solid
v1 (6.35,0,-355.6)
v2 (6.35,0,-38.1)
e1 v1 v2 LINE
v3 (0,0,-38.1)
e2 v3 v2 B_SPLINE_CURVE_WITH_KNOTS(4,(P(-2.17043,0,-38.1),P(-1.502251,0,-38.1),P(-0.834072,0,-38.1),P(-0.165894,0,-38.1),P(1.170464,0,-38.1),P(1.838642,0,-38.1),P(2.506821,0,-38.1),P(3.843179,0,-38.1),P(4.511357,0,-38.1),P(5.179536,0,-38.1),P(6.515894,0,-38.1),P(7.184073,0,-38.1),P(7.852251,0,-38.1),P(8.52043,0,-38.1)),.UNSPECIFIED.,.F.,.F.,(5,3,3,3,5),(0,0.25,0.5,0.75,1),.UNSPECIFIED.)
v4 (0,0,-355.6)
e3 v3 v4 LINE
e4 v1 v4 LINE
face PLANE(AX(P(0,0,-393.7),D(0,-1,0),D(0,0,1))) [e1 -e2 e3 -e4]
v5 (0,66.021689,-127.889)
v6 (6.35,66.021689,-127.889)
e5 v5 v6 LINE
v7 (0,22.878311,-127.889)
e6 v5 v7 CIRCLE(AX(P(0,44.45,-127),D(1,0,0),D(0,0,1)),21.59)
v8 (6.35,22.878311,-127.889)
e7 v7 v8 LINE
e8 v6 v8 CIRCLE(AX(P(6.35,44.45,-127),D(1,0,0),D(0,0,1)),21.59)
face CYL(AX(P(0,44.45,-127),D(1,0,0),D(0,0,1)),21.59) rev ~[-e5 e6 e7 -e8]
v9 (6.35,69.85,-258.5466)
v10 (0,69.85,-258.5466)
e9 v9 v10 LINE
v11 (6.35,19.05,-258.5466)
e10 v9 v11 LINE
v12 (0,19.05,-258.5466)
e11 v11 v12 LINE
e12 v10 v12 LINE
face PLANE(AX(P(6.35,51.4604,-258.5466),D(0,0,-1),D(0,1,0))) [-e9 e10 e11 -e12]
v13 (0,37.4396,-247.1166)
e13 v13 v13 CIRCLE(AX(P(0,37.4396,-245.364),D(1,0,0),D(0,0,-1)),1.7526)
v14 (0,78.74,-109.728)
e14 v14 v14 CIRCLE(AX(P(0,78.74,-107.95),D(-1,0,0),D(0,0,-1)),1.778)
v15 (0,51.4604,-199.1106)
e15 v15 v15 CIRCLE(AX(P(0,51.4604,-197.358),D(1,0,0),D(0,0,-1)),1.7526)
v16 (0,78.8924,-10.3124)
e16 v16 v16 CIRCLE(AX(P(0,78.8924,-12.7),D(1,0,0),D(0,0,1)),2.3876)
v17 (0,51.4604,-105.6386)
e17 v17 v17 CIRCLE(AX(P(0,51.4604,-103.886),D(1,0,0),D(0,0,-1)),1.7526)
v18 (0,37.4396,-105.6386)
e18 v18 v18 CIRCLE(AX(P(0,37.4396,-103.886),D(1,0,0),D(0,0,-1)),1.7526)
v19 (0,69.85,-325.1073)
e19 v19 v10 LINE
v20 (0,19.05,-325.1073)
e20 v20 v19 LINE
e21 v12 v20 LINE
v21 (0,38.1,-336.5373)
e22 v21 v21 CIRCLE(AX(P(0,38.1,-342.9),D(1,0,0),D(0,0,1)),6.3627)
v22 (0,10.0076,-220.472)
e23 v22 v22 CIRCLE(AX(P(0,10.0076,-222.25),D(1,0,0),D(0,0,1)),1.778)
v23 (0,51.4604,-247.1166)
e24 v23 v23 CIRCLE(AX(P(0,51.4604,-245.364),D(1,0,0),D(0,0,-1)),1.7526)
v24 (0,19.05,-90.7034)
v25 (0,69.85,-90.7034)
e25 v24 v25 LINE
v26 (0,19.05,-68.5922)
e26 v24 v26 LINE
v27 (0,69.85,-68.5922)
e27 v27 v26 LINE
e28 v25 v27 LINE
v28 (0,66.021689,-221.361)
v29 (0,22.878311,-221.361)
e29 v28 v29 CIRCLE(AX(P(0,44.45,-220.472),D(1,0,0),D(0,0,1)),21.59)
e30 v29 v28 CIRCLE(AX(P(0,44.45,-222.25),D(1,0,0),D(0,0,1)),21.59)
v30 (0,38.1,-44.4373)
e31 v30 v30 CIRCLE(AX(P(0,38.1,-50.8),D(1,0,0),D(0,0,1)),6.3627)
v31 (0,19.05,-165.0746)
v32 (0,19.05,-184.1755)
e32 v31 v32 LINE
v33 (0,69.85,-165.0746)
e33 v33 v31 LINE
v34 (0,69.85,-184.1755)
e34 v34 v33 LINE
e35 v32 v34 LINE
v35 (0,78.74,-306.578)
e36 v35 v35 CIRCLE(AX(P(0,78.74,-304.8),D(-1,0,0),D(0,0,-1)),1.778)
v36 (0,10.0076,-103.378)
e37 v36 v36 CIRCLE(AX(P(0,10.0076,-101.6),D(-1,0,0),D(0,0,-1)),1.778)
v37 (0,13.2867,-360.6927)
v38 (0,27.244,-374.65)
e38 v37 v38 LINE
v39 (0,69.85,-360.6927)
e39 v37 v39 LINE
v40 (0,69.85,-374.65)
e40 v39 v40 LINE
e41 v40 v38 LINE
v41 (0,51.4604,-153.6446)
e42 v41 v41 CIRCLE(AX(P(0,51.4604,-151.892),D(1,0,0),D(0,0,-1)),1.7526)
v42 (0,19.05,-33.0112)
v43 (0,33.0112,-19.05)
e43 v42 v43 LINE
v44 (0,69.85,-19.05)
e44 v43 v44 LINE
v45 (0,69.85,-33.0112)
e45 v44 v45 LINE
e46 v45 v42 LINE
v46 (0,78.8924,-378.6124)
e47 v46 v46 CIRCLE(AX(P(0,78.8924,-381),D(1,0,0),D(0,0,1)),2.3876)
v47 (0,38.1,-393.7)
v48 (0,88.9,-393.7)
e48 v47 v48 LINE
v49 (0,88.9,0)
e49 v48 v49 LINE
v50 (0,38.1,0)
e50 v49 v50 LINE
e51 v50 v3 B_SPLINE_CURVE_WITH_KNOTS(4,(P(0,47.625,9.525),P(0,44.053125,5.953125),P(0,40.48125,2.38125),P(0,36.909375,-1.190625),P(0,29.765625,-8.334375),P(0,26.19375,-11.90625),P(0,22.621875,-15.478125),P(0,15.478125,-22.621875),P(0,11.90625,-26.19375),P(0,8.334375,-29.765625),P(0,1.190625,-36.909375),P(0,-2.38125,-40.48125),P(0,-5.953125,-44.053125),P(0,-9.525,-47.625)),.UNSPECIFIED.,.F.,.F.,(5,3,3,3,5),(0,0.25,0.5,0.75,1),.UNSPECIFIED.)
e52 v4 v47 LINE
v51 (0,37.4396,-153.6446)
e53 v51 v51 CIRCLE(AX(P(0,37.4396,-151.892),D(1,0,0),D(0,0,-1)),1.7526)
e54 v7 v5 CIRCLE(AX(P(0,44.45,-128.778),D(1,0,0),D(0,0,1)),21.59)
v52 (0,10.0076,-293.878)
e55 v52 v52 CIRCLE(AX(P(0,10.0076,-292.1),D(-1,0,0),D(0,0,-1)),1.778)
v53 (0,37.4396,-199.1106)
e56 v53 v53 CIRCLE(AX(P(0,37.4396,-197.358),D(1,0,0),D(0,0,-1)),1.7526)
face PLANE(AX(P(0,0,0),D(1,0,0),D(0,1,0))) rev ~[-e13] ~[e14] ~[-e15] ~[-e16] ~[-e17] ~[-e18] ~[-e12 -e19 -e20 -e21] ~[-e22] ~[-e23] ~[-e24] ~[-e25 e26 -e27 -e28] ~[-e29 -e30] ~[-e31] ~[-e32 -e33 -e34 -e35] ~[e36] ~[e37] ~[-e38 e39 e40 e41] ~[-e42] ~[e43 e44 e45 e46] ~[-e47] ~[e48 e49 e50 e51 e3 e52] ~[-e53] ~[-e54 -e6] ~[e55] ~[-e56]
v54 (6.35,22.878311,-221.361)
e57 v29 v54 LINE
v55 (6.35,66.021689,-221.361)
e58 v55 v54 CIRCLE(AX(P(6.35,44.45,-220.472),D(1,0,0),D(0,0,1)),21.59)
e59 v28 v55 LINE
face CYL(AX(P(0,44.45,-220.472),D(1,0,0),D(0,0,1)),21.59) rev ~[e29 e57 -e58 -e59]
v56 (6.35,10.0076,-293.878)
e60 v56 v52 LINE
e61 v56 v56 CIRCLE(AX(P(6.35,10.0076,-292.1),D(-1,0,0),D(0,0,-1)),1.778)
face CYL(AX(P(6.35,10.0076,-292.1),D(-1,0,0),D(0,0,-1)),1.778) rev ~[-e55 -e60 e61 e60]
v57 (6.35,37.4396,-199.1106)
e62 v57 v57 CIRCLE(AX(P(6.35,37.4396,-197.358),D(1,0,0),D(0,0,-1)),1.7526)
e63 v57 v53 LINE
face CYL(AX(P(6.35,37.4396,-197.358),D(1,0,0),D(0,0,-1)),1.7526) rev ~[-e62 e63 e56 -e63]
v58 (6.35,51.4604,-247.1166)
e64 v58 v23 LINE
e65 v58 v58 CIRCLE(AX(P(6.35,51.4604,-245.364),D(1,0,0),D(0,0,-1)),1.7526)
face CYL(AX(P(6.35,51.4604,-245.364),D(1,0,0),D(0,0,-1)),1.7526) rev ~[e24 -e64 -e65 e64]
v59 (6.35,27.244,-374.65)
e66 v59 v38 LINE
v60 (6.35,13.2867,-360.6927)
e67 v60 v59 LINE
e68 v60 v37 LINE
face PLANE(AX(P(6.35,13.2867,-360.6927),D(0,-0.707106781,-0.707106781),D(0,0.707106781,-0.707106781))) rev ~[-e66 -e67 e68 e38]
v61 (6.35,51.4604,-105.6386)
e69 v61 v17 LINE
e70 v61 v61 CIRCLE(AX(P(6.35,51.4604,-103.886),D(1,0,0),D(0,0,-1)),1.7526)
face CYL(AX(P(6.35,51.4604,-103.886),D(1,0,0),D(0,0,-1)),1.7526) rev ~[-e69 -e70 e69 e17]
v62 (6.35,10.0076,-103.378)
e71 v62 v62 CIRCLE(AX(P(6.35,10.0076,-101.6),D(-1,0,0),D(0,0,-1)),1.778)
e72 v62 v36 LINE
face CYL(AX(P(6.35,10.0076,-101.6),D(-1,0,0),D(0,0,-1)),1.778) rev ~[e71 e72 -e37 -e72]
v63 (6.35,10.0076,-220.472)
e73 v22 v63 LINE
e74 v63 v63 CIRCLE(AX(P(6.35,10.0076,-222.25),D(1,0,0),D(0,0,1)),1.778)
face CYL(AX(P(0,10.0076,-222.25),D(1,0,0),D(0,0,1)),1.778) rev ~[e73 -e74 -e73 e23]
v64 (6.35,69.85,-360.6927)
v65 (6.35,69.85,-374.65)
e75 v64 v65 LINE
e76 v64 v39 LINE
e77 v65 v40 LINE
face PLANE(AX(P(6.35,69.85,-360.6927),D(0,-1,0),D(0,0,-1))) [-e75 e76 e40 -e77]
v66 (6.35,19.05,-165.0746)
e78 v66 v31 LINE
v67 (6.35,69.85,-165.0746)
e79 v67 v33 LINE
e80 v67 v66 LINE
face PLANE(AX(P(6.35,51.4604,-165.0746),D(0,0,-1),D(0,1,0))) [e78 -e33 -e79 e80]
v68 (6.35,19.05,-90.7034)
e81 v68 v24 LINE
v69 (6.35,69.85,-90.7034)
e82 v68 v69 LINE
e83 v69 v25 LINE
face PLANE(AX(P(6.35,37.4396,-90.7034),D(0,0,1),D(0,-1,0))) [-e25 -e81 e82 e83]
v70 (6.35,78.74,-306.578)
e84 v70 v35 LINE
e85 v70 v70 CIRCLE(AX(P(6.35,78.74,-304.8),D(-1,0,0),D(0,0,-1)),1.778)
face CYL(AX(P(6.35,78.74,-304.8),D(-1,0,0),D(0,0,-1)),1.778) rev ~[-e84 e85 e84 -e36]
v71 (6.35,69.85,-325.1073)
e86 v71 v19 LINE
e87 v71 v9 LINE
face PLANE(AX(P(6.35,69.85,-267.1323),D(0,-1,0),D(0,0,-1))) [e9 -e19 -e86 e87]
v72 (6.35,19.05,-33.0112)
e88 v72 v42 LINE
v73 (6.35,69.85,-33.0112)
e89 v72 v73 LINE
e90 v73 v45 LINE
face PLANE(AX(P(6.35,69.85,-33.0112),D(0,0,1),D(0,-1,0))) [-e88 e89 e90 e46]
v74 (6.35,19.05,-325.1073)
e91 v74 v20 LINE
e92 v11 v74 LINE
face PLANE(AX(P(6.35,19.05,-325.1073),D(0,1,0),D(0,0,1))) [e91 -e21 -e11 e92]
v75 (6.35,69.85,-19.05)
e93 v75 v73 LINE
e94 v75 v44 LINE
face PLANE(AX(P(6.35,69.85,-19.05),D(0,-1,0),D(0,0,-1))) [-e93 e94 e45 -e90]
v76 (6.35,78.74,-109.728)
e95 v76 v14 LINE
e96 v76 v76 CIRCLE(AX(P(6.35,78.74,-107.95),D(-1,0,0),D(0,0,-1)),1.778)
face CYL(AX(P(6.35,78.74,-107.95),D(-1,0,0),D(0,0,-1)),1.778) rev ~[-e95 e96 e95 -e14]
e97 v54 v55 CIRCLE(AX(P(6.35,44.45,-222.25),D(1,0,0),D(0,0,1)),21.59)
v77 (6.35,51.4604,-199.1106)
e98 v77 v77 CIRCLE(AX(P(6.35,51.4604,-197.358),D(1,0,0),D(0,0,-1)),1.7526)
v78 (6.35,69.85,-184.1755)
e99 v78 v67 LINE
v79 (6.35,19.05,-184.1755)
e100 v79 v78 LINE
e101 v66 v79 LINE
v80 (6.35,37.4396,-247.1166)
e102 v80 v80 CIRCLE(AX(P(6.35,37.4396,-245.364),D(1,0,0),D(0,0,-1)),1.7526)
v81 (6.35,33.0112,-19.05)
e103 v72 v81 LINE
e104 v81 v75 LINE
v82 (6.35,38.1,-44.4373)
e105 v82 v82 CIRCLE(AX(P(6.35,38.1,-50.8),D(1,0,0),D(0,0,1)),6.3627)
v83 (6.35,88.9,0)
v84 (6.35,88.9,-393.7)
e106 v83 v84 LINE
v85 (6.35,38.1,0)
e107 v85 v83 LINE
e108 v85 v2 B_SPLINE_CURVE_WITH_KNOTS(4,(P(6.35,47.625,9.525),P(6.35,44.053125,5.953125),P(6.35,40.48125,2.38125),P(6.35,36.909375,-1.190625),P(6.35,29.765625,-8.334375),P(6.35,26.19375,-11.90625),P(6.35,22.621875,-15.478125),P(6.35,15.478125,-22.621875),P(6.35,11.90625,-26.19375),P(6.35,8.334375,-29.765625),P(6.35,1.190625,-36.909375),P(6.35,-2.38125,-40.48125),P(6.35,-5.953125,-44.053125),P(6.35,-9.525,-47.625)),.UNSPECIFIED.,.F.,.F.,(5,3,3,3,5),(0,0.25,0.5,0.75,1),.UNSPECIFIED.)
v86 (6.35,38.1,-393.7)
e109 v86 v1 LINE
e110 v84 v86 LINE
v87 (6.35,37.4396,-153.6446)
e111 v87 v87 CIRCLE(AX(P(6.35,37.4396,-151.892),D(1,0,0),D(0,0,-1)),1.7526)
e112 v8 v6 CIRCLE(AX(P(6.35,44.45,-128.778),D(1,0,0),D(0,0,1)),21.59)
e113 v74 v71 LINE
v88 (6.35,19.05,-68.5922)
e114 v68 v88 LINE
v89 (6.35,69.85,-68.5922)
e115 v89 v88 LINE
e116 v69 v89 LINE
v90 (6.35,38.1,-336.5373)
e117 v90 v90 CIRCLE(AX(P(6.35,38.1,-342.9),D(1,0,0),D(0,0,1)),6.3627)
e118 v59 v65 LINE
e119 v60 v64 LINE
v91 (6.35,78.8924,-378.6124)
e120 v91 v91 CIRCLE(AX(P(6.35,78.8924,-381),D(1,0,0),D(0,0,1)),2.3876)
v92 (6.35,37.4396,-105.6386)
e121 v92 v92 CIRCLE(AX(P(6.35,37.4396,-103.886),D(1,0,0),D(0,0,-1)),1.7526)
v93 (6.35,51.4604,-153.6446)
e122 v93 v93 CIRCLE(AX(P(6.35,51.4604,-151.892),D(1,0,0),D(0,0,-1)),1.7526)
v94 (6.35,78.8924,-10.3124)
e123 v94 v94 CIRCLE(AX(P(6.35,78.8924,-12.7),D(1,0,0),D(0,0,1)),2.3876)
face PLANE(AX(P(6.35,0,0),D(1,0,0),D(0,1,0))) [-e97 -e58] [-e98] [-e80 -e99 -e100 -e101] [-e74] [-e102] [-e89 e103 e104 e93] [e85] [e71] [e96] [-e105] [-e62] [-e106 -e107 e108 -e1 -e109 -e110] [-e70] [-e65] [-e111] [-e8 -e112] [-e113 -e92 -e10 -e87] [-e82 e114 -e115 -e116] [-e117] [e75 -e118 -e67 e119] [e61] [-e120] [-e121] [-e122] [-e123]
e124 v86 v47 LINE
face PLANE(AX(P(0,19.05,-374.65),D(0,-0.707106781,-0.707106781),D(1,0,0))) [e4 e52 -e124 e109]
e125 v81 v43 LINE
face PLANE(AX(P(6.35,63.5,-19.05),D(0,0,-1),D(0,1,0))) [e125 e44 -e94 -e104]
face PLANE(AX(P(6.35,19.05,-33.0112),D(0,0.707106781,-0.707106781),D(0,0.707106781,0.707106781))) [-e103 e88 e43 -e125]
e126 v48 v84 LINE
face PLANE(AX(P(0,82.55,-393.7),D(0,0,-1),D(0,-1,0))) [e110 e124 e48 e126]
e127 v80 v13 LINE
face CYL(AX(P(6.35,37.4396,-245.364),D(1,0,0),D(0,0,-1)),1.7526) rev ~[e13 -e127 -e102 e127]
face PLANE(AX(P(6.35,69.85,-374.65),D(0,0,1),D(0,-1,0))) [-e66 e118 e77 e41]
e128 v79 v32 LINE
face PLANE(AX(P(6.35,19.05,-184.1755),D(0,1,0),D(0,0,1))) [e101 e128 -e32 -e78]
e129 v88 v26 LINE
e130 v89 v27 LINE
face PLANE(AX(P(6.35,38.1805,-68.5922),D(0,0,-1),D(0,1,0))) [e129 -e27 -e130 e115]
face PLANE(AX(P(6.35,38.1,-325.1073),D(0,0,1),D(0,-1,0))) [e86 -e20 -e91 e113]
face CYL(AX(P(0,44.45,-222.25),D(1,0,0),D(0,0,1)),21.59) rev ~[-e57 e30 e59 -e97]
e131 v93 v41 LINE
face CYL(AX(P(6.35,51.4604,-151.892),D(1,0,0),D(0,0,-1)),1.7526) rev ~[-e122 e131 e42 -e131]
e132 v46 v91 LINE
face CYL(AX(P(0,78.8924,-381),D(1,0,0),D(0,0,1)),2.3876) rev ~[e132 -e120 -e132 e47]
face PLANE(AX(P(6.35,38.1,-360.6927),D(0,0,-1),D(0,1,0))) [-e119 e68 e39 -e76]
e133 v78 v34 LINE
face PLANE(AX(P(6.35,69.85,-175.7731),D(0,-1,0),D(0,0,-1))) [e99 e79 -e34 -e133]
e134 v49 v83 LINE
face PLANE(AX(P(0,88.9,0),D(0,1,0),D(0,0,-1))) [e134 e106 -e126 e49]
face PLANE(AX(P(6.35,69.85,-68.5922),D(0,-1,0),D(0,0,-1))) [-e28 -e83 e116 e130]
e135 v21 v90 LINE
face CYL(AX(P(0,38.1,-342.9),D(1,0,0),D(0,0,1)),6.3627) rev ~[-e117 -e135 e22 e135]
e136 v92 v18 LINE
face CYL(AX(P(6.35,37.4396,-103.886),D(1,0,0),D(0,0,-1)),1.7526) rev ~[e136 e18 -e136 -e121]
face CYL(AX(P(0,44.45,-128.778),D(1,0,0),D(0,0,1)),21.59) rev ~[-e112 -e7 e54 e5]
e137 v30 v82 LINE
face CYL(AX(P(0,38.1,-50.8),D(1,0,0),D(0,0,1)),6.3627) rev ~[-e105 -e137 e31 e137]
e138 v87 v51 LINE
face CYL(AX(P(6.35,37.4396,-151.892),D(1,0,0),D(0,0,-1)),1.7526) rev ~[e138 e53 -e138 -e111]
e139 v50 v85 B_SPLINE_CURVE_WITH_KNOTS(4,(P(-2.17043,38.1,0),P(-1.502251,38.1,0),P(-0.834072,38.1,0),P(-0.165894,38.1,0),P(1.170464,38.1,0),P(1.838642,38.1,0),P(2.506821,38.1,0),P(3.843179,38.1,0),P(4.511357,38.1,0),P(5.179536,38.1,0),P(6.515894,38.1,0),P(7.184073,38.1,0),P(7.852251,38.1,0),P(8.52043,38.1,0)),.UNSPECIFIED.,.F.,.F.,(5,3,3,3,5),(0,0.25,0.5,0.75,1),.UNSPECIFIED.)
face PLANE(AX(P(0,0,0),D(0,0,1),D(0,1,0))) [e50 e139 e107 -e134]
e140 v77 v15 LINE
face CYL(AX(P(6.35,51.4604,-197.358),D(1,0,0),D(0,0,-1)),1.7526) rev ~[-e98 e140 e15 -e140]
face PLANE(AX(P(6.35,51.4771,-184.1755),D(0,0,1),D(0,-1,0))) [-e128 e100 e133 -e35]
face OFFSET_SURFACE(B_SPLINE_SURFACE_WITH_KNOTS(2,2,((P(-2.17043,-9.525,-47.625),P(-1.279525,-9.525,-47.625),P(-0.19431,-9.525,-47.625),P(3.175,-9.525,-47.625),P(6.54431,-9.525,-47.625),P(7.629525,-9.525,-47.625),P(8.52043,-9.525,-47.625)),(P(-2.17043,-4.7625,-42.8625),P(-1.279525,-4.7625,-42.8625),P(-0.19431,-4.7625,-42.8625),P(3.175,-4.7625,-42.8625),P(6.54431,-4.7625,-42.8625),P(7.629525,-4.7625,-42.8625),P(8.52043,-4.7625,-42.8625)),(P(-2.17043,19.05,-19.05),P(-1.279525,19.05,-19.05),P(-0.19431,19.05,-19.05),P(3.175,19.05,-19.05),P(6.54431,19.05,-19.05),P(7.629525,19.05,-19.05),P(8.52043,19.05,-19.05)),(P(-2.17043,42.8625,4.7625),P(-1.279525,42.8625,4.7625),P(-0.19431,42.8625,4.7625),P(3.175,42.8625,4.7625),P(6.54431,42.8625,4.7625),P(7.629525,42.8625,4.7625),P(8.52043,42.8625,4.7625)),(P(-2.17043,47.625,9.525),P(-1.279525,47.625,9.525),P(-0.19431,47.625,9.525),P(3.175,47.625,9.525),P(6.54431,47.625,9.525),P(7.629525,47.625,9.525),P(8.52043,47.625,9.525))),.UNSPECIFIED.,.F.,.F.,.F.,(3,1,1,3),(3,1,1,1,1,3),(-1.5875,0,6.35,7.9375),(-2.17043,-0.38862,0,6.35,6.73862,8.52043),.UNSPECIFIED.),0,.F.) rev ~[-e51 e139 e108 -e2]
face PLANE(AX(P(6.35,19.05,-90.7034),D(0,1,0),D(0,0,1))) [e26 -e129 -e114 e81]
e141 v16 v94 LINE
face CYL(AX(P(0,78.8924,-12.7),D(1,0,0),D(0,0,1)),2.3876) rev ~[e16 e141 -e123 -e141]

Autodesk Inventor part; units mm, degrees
ref_plane "YZ Plane" through (0, 0, 0) normal (1, 0, 0) x (0, 1, 0)
ref_plane "XZ Plane" through (0, 0, 0) normal (0, 1, 0) x (-1, 0, 0)
ref_plane "XY Plane" through (0, 0, 0) normal (0, 0, 1) x (1, 0, 0)
sketch "Sketch1" plane through (0, 0, 0) normal (1, 0, 0) x (0, 1, 0)
  line L0 (444.5, 0) -> (444.5, -2.1042)
  line L1 (0, -2.1042) -> (0, 0)
  line L2 (0, -74.1174) -> (0, -66.8433)
  line L3 (0, 0) -> (82.55, 0)
  line L4 (82.55, 0) -> (82.55, -393.7)
  line L5 (82.55, -393.7) -> (0, -393.7)
  line L6 (0, -393.7) -> (0, 0)
  point P0 (25.4, -50.8)
  point P1 (25.4, -342.9)
  dimension "d2" = 82.55
  dimension "d3" = 393.7
  dimension "d4" = 50.8
  dimension "d5" = 25.4
  dimension "d6" = 50.8
  dimension "d7" = 25.4
extrude "Extrusion1" add sketch "Sketch1" along normal blind 6.35
sketch "Sketch3" plane through (6.35, 0, 0) normal (1, 0, 0) x (0, 0, -1)
  point P0 (0, 0)
sketch "Sketch4" plane through (6.35, 0, 0) normal (1, 0, 0) x (0, 0, -1)
  point P0 (0, 0)
chamfer "Chamfer1" distance 38.1 angle 45 1 edges at (3.175, 0, 0)
chamfer "Chamfer2" distance 38.1 angle 45 1 edges at (3.175, 0, -393.7)
sketch "Sketch5" plane through (0, 0, 0) normal (-1, 0, 0) x (0, 0, 1)
  line L0 (0, 82.55) -> (-393.7, 82.55) projected
  line L1 (-355.6, 0) -> (-393.7, 38.1) projected
  line L2 (-355.6, 0) -> (-38.1, 0) projected
  line L3 (0, 38.1) -> (-38.1, 0) projected
  line L4 (0, 38.1) -> (0, 82.55) projected
  line L5 (0, 82.55) -> (-393.7, 82.55) projected
  line L6 (-393.7, 82.55) -> (-393.7, 38.1) projected
  point P0 (0, 0)
  point P1 (-342.9, 38.1)
  point P2 (-50.8, 38.1)
  dimension "d16" = 50.8
  dimension "d17" = 38.1
  dimension "d18" = 38.1
  dimension "d19" = 50.8
hole "Hole1" at (0, 38.1, -342.9) at (0, 38.1, -50.8) direction (1, 0, 0) diameter 12.7254 end through all
sketch "Sketch7" plane through (0, 0, 0) normal (-1, 0, 0) x (0, 0, 1)
  line L0 (-38.1, 0) -> (-355.6, 0) projected
  line L1 (-393.7, 82.55) -> (-393.7, 38.1) projected
  line L2 (0, 38.1) -> (0, 82.55) projected
  line L3 (0, 82.55) -> (-393.7, 82.55) projected
  point P0 (0, 0)
  point P1 (-298.45, 10.0076)
  point P2 (-95.25, 10.0076)
  point P3 (-12.7, 78.8924)
  point P4 (-381, 78.8924)
  dimension "d42" = 10.0076
  dimension "d43" = 95.25
  dimension "d44" = 95.25
  dimension "d45" = 3.6576
  dimension "d46" = 12.7
  dimension "d47" = 12.7
  dimension "d82" = 3.6576
hole "Hole3" at (0, 78.8924, -381) at (0, 78.8924, -12.7) direction (1, 0, 0) diameter 4.7752 end through all
sketch "Sketch8" plane through (0, 0, 0) normal (-1, 0, 0) x (0, 0, 1)
  line L0 (0, 38.1) -> (0, 82.55) projected
  line L1 (0, 82.55) -> (-393.7, 82.55) projected
  line L2 (-355.6, 0) -> (-38.1, 0) projected
  line L3 (-393.7, 38.1) -> (-393.7, 82.55) projected
  point P0 (0, 0)
  point P1 (-171.45, 78.8924)
  point P2 (-222.25, 10.0076)
  dimension "d57" = 10.0076
  dimension "d128" = 222.25
hole "Hole4" at (0, 10.0076, -222.25) direction (1, 0, 0) diameter 3.556 end through all
sketch "Sketch10" plane through (0, 0, 0) normal (-1, 0, 0) x (0, 0, 1)
  circle A0 centre (-222.25, 44.45) radius 1.778
  circle A1 centre (-127, 44.45) radius 1.778
  line L0 (-393.7, 82.55) -> (0, 82.55) projected
  line L1 (-114.3619, 67.6125) -> (-112.4836, 67.6125)
  point P0 (0, 0)
  point P1 (-220.472, 44.45)
  point P2 (-128.778, 44.45)
  dimension "d108" = 38.1
  dimension "d109" = 38.1
hole "Hole6" at (0, 44.45, -127) at (0, 44.45, -220.472) at (0, 44.45, -128.778) at (0, 44.45, -222.25) direction (1, 0, 0) diameter 43.18 end through all
sketch "Sketch14" plane through (6.35, 0, 0) normal (1, 0, 0) x (0, 0, -1)
  arc A0 (127.889, 66.0217) -> (127.889, 22.8783) centre (127, 44.45) ccw projected
  arc A1 (127.889, 22.8783) -> (127.889, 66.0217) centre (128.778, 44.45) ccw projected
  arc A2 (221.361, 66.0217) -> (221.361, 22.8783) centre (220.472, 44.45) ccw projected
  arc A3 (221.361, 22.8783) -> (221.361, 66.0217) centre (222.25, 44.45) ccw projected
  line L0 (127.889, 66.0217) -> (127.889, 22.8783)
  line L1 (96.03, 44.45) -> (156.5626, 44.45)
  line L2 (221.361, 66.0217) -> (221.361, 22.8783)
  line L3 (190.5646, 36.322) -> (248.6345, 36.322)
  line L4 (127.889, 44.45) -> (103.886, 44.45)
  line L5 (103.886, 44.45) -> (103.886, 51.4604)
  line L6 (103.886, 51.4604) -> (103.886, 44.45)
  line L7 (103.886, 44.45) -> (103.886, 37.4396)
  line L8 (127.889, 44.45) -> (151.892, 44.45)
  line L9 (151.892, 44.45) -> (151.892, 37.4396)
  line L10 (151.892, 44.45) -> (151.892, 51.4604)
  line L11 (221.361, 51.4604) -> (197.358, 51.4604)
  line L12 (221.361, 51.4604) -> (245.364, 51.4604)
  line L13 (221.361, 37.4396) -> (197.358, 37.4396)
  line L14 (221.361, 37.4396) -> (245.364, 37.4396)
  circle A4 centre (103.886, 37.4396) radius 1.7526
  circle A5 centre (103.886, 51.4604) radius 1.7526
  circle A6 centre (151.892, 51.4604) radius 1.7526
  circle A7 centre (151.892, 37.4396) radius 1.7526
  circle A8 centre (197.358, 51.4604) radius 1.7526
  circle A9 centre (197.358, 37.4396) radius 1.7526
  circle A10 centre (245.364, 37.4396) radius 1.7526
  circle A11 centre (245.364, 51.4604) radius 1.7526
  point P0 (0, 0)
  dimension "d113" = 24.003
  dimension "d114" = 7.0104
  dimension "d115" = 7.0104
  dimension "d116" = 24.003
  dimension "d117" = 24.003
  dimension "d118" = 24.003
  dimension "d119" = 3.5052
  dimension "d120" = 3.5052
  dimension "d121" = 3.5052
  dimension "d122" = 3.5052
  dimension "d123" = 3.5052
extrude "Extrusion2" cut sketch "Sketch14" against normal blind 25.4 contours A9 L3 | A10 L3 | A9 L3 | L3 A10 | A4 | A5 | A6 | A7 | A8 | A11
thicken "Thicken1" operation add thickness 6.35 both sides no extend neighbours yes toward (0, 1, 0) faces at (2.1167, 82.55, -131.2333)
sketch "Sketch16" plane through (6.35, 0, 0) normal (1, 0, 0) x (0, 0, -1)
  line L0 (393.7, 88.9) -> (0, 88.9) projected
  line L1 (42.6019, 88.9) -> (52.7619, 88.9)
  line L2 (52.7619, 88.9) -> (52.7619, 78.74)
  line L3 (31.75, 78.74) -> (107.95, 78.74)
  line L4 (31.75, 78.74) -> (107.95, 78.74) construction
  point P0 (0, 0)
  dimension "d131" = 10.16
  dimension "d132" = 10.16
  dimension "d133" = 76.2
sketch "Sketch17" plane through (6.35, 0, 0) normal (1, 0, 0) x (0, 0, -1)
  circle A0 centre (139.7, 78.74) radius 1.778
  line L0 (393.7, 38.1) -> (393.7, 88.9) projected
  line L1 (393.7, 78.74) -> (304.8, 78.74)
  line L2 (393.7, 78.74) -> (482.6, 78.74) construction
  circle A1 centre (304.8, 78.74) radius 1.778
  point P0 (0, 0)
  dimension "d135" = 3.556
  dimension "d136" = 88.9
  dimension "d138" = 3.556
sketch "Sketch18" plane through (6.35, 0, 0) normal (1, 0, 0) x (0, 0, -1)
  line L0 (0, 0) -> (0, 10.0076)
  line L1 (0, 0) -> (10.0076, 0) construction
  line L2 (0, 10.0076) -> (101.6, 10.0076)
  line L3 (0, 10.0076) -> (101.6, 10.0076) construction
  line L4 (393.7, 10.0076) -> (292.1, 10.0076)
  line L5 (393.7, 10.0076) -> (495.3, 10.0076) construction
  circle A0 centre (101.6, 10.0076) radius 2.3876
  circle A1 centre (292.1, 10.0076) radius 2.3876
  dimension "d139" = 10.0076
  dimension "d141" = 101.6
  dimension "d143" = 101.6
  dimension "d145" = 4.7752
  dimension "d146" = 4.7752
hole "Hole10" at (6.35, 78.74, -107.95) direction (-1, 0, 0) diameter 3.556 depth 25.4 tip angle 118
hole "Hole11" at (6.35, 78.74, -304.8) direction (-1, 0, 0) diameter 3.556 depth 25.4 tip angle 118
hole "Hole12" at (6.35, 10.0076, -292.1) direction (-1, 0, 0) diameter 3.556 depth 25.4 tip angle 118
hole "Hole13" at (6.35, 10.0076, -101.6) direction (-1, 0, 0) diameter 3.556 depth 25.4 tip angle 118
sketch "Sketch19" plane through (6.35, 0, 0) normal (1, 0, 0) x (0, 0, -1)
  point P0 (0, 0)
sketch "Sketch20" plane through (6.35, 0, 0) normal (1, 0, 0) x (0, 0, -1)
  line L0 (0, 88.9) -> (0, 38.1) projected
  line L1 (38.1, 0) -> (0, 38.1) projected
  line L2 (38.1, 0) -> (355.6, 0) projected
  line L3 (393.7, 38.1) -> (355.6, 0) projected
  line L4 (393.7, 38.1) -> (393.7, 88.9) projected
  line L5 (393.7, 88.9) -> (0, 88.9) projected
  line L6 (0, 63.5) -> (19.05, 63.5)
  line L7 (19.05, 88.9) -> (19.05, 69.85)
  line L8 (56.4869, 0) -> (56.4869, 19.05)
  circle A0 centre (50.8, 38.1) radius 6.3627 projected
  circle A1 centre (50.8, 38.1) radius 6.3627 projected
  line L9 (44.4412, 37.8775) -> (33.0112, 37.8775)
  line L10 (50.5074, 44.456) -> (50.5074, 55.886)
  line L11 (57.1622, 38.1805) -> (68.5922, 38.1805)
  circle A2 centre (103.886, 37.4396) radius 1.7526 projected
  line L12 (102.1334, 37.4396) -> (90.7034, 37.4396)
  line L13 (80.4606, 88.9) -> (80.4606, 69.85)
  line L14 (68.5922, 69.85) -> (90.7034, 69.85)
  line L15 (90.7034, 69.85) -> (90.7034, 19.05)
  line L16 (90.7034, 19.05) -> (68.5922, 19.05)
  line L17 (68.5922, 19.05) -> (68.5922, 69.85)
  line L18 (19.05, 69.85) -> (33.0112, 69.85)
  line L19 (33.0112, 69.85) -> (33.0112, 33.0112)
  line L20 (33.0112, 33.0112) -> (19.05, 33.0112)
  line L21 (19.05, 33.0112) -> (19.05, 69.85)
  line L22 (19.05, 33.0112) -> (33.0112, 33.0112)
  line L23 (33.0112, 33.0112) -> (33.0112, 19.05)
  line L24 (33.0112, 19.05) -> (19.05, 33.0112)
  line L25 (33.0112, 19.05) -> (33.0112, 33.0112)
  line L26 (19.05, 33.0112) -> (33.0112, 33.0112)
  line L27 (19.05, 33.0112) -> (33.0112, 19.05)
  line L28 (33.0112, 33.0112) -> (33.0112, 69.85)
  line L29 (33.0112, 69.85) -> (19.05, 69.85)
  line L30 (19.05, 69.85) -> (19.05, 33.0112)
  point P0 (0, 0)
  dimension "d183" = 19.05
  dimension "d184" = 19.05
  dimension "d185" = 19.05
  dimension "d186" = 11.43
  dimension "d187" = 11.43
  dimension "d188" = 11.43
  dimension "d189" = 11.43
  dimension "d190" = 19.05
extrude "Extrusion3" cut sketch "Sketch20" against normal blind 25.4 contours L14 L15 L16 L17
extrude "Extrusion4" cut sketch "Sketch20" against normal blind 25.4 contours L21 L18 L19 L20 | L20 L23 L24
sketch "Sketch21" plane through (6.35, 0, 0) normal (1, 0, 0) x (0, 0, -1)
  circle A0 centre (151.892, 51.4604) radius 1.7526 projected
  line L0 (38.1, 0) -> (355.6, 0) projected
  circle A1 centre (197.358, 51.4604) radius 1.7526 projected
  line L1 (393.7, 88.9) -> (0, 88.9) projected
  line L2 (0, 88.9) -> (393.7, 88.9) projected
  line L3 (175.7731, 88.9) -> (175.7731, 69.85)
  line L4 (153.6446, 51.4604) -> (165.0746, 51.4604)
  circle A2 centre (197.358, 51.4604) radius 1.7526 projected
  line L5 (195.6055, 51.4771) -> (184.1755, 51.4771)
  line L6 (355.6, 0) -> (38.1, 0) projected
  line L7 (175.7731, 0) -> (175.7731, 19.05)
  line L8 (165.0746, 69.85) -> (184.1755, 69.85)
  line L9 (184.1755, 69.85) -> (184.1755, 19.05)
  line L10 (184.1755, 19.05) -> (165.0746, 19.05)
  line L11 (165.0746, 19.05) -> (165.0746, 69.85)
  circle A3 centre (245.364, 51.4604) radius 1.7526 projected
  circle A4 centre (245.364, 37.4396) radius 1.7526 projected
  circle A5 centre (342.9, 38.1) radius 6.3627 projected
  line L12 (267.1323, 0) -> (267.1323, 19.05)
  line L13 (267.1323, 88.9) -> (267.1323, 69.85)
  line L14 (247.1166, 51.4604) -> (258.5466, 51.4604)
  line L15 (336.5373, 38.1) -> (325.1073, 38.1)
  line L16 (258.5466, 69.85) -> (325.1073, 69.85)
  line L17 (325.1073, 69.85) -> (325.1073, 19.05)
  line L18 (325.1073, 19.05) -> (258.5466, 19.05)
  line L19 (258.5466, 19.05) -> (258.5466, 69.85)
  point P0 (0, 0)
  dimension "d195" = 19.05
  dimension "d196" = 11.43
  dimension "d197" = 11.43
  dimension "d198" = 19.05
  dimension "d199" = 19.05
  dimension "d200" = 19.05
  dimension "d201" = 11.43
  dimension "d202" = 11.43
extrude "Extrusion5" cut sketch "Sketch21" against normal blind 25.4 contours L10 L11 L8 L9
extrude "Extrusion6" cut sketch "Sketch21" against normal blind 25.4 contours L18 L19 L16 L17
sketch "Sketch22" plane through (6.35, 0, 0) normal (1, 0, 0) x (0, 0, -1)
  line L0 (393.7, 38.1) -> (393.7, 88.9) projected
  line L1 (361.8045, 88.9) -> (361.8045, 69.85)
  circle A0 centre (342.9, 38.1) radius 6.3627 projected
  line L2 (349.2627, 38.1) -> (360.6927, 38.1)
  line L3 (393.7, 39.2414) -> (374.65, 39.2414)
  line L4 (360.6927, 69.85) -> (374.65, 69.85)
  line L5 (374.65, 69.85) -> (374.65, 27.244)
  line L6 (374.65, 27.244) -> (360.6927, 27.244)
  line L7 (360.6927, 27.244) -> (360.6927, 69.85)
  line L8 (360.6927, 27.244) -> (360.6927, 13.2867)
  line L9 (360.6927, 13.2867) -> (374.65, 27.244)
  line L10 (355.6, 0) -> (393.7, 38.1) projected
  point P0 (0, 0)
  dimension "d207" = 19.05
  dimension "d208" = 11.43
  dimension "d209" = 19.05
extrude "Extrusion7" cut sketch "Sketch22" against normal blind 25.4 contours L4 L5 L6 L7 | L6 L9 L8
properties part number "DriveTrainPlate"
